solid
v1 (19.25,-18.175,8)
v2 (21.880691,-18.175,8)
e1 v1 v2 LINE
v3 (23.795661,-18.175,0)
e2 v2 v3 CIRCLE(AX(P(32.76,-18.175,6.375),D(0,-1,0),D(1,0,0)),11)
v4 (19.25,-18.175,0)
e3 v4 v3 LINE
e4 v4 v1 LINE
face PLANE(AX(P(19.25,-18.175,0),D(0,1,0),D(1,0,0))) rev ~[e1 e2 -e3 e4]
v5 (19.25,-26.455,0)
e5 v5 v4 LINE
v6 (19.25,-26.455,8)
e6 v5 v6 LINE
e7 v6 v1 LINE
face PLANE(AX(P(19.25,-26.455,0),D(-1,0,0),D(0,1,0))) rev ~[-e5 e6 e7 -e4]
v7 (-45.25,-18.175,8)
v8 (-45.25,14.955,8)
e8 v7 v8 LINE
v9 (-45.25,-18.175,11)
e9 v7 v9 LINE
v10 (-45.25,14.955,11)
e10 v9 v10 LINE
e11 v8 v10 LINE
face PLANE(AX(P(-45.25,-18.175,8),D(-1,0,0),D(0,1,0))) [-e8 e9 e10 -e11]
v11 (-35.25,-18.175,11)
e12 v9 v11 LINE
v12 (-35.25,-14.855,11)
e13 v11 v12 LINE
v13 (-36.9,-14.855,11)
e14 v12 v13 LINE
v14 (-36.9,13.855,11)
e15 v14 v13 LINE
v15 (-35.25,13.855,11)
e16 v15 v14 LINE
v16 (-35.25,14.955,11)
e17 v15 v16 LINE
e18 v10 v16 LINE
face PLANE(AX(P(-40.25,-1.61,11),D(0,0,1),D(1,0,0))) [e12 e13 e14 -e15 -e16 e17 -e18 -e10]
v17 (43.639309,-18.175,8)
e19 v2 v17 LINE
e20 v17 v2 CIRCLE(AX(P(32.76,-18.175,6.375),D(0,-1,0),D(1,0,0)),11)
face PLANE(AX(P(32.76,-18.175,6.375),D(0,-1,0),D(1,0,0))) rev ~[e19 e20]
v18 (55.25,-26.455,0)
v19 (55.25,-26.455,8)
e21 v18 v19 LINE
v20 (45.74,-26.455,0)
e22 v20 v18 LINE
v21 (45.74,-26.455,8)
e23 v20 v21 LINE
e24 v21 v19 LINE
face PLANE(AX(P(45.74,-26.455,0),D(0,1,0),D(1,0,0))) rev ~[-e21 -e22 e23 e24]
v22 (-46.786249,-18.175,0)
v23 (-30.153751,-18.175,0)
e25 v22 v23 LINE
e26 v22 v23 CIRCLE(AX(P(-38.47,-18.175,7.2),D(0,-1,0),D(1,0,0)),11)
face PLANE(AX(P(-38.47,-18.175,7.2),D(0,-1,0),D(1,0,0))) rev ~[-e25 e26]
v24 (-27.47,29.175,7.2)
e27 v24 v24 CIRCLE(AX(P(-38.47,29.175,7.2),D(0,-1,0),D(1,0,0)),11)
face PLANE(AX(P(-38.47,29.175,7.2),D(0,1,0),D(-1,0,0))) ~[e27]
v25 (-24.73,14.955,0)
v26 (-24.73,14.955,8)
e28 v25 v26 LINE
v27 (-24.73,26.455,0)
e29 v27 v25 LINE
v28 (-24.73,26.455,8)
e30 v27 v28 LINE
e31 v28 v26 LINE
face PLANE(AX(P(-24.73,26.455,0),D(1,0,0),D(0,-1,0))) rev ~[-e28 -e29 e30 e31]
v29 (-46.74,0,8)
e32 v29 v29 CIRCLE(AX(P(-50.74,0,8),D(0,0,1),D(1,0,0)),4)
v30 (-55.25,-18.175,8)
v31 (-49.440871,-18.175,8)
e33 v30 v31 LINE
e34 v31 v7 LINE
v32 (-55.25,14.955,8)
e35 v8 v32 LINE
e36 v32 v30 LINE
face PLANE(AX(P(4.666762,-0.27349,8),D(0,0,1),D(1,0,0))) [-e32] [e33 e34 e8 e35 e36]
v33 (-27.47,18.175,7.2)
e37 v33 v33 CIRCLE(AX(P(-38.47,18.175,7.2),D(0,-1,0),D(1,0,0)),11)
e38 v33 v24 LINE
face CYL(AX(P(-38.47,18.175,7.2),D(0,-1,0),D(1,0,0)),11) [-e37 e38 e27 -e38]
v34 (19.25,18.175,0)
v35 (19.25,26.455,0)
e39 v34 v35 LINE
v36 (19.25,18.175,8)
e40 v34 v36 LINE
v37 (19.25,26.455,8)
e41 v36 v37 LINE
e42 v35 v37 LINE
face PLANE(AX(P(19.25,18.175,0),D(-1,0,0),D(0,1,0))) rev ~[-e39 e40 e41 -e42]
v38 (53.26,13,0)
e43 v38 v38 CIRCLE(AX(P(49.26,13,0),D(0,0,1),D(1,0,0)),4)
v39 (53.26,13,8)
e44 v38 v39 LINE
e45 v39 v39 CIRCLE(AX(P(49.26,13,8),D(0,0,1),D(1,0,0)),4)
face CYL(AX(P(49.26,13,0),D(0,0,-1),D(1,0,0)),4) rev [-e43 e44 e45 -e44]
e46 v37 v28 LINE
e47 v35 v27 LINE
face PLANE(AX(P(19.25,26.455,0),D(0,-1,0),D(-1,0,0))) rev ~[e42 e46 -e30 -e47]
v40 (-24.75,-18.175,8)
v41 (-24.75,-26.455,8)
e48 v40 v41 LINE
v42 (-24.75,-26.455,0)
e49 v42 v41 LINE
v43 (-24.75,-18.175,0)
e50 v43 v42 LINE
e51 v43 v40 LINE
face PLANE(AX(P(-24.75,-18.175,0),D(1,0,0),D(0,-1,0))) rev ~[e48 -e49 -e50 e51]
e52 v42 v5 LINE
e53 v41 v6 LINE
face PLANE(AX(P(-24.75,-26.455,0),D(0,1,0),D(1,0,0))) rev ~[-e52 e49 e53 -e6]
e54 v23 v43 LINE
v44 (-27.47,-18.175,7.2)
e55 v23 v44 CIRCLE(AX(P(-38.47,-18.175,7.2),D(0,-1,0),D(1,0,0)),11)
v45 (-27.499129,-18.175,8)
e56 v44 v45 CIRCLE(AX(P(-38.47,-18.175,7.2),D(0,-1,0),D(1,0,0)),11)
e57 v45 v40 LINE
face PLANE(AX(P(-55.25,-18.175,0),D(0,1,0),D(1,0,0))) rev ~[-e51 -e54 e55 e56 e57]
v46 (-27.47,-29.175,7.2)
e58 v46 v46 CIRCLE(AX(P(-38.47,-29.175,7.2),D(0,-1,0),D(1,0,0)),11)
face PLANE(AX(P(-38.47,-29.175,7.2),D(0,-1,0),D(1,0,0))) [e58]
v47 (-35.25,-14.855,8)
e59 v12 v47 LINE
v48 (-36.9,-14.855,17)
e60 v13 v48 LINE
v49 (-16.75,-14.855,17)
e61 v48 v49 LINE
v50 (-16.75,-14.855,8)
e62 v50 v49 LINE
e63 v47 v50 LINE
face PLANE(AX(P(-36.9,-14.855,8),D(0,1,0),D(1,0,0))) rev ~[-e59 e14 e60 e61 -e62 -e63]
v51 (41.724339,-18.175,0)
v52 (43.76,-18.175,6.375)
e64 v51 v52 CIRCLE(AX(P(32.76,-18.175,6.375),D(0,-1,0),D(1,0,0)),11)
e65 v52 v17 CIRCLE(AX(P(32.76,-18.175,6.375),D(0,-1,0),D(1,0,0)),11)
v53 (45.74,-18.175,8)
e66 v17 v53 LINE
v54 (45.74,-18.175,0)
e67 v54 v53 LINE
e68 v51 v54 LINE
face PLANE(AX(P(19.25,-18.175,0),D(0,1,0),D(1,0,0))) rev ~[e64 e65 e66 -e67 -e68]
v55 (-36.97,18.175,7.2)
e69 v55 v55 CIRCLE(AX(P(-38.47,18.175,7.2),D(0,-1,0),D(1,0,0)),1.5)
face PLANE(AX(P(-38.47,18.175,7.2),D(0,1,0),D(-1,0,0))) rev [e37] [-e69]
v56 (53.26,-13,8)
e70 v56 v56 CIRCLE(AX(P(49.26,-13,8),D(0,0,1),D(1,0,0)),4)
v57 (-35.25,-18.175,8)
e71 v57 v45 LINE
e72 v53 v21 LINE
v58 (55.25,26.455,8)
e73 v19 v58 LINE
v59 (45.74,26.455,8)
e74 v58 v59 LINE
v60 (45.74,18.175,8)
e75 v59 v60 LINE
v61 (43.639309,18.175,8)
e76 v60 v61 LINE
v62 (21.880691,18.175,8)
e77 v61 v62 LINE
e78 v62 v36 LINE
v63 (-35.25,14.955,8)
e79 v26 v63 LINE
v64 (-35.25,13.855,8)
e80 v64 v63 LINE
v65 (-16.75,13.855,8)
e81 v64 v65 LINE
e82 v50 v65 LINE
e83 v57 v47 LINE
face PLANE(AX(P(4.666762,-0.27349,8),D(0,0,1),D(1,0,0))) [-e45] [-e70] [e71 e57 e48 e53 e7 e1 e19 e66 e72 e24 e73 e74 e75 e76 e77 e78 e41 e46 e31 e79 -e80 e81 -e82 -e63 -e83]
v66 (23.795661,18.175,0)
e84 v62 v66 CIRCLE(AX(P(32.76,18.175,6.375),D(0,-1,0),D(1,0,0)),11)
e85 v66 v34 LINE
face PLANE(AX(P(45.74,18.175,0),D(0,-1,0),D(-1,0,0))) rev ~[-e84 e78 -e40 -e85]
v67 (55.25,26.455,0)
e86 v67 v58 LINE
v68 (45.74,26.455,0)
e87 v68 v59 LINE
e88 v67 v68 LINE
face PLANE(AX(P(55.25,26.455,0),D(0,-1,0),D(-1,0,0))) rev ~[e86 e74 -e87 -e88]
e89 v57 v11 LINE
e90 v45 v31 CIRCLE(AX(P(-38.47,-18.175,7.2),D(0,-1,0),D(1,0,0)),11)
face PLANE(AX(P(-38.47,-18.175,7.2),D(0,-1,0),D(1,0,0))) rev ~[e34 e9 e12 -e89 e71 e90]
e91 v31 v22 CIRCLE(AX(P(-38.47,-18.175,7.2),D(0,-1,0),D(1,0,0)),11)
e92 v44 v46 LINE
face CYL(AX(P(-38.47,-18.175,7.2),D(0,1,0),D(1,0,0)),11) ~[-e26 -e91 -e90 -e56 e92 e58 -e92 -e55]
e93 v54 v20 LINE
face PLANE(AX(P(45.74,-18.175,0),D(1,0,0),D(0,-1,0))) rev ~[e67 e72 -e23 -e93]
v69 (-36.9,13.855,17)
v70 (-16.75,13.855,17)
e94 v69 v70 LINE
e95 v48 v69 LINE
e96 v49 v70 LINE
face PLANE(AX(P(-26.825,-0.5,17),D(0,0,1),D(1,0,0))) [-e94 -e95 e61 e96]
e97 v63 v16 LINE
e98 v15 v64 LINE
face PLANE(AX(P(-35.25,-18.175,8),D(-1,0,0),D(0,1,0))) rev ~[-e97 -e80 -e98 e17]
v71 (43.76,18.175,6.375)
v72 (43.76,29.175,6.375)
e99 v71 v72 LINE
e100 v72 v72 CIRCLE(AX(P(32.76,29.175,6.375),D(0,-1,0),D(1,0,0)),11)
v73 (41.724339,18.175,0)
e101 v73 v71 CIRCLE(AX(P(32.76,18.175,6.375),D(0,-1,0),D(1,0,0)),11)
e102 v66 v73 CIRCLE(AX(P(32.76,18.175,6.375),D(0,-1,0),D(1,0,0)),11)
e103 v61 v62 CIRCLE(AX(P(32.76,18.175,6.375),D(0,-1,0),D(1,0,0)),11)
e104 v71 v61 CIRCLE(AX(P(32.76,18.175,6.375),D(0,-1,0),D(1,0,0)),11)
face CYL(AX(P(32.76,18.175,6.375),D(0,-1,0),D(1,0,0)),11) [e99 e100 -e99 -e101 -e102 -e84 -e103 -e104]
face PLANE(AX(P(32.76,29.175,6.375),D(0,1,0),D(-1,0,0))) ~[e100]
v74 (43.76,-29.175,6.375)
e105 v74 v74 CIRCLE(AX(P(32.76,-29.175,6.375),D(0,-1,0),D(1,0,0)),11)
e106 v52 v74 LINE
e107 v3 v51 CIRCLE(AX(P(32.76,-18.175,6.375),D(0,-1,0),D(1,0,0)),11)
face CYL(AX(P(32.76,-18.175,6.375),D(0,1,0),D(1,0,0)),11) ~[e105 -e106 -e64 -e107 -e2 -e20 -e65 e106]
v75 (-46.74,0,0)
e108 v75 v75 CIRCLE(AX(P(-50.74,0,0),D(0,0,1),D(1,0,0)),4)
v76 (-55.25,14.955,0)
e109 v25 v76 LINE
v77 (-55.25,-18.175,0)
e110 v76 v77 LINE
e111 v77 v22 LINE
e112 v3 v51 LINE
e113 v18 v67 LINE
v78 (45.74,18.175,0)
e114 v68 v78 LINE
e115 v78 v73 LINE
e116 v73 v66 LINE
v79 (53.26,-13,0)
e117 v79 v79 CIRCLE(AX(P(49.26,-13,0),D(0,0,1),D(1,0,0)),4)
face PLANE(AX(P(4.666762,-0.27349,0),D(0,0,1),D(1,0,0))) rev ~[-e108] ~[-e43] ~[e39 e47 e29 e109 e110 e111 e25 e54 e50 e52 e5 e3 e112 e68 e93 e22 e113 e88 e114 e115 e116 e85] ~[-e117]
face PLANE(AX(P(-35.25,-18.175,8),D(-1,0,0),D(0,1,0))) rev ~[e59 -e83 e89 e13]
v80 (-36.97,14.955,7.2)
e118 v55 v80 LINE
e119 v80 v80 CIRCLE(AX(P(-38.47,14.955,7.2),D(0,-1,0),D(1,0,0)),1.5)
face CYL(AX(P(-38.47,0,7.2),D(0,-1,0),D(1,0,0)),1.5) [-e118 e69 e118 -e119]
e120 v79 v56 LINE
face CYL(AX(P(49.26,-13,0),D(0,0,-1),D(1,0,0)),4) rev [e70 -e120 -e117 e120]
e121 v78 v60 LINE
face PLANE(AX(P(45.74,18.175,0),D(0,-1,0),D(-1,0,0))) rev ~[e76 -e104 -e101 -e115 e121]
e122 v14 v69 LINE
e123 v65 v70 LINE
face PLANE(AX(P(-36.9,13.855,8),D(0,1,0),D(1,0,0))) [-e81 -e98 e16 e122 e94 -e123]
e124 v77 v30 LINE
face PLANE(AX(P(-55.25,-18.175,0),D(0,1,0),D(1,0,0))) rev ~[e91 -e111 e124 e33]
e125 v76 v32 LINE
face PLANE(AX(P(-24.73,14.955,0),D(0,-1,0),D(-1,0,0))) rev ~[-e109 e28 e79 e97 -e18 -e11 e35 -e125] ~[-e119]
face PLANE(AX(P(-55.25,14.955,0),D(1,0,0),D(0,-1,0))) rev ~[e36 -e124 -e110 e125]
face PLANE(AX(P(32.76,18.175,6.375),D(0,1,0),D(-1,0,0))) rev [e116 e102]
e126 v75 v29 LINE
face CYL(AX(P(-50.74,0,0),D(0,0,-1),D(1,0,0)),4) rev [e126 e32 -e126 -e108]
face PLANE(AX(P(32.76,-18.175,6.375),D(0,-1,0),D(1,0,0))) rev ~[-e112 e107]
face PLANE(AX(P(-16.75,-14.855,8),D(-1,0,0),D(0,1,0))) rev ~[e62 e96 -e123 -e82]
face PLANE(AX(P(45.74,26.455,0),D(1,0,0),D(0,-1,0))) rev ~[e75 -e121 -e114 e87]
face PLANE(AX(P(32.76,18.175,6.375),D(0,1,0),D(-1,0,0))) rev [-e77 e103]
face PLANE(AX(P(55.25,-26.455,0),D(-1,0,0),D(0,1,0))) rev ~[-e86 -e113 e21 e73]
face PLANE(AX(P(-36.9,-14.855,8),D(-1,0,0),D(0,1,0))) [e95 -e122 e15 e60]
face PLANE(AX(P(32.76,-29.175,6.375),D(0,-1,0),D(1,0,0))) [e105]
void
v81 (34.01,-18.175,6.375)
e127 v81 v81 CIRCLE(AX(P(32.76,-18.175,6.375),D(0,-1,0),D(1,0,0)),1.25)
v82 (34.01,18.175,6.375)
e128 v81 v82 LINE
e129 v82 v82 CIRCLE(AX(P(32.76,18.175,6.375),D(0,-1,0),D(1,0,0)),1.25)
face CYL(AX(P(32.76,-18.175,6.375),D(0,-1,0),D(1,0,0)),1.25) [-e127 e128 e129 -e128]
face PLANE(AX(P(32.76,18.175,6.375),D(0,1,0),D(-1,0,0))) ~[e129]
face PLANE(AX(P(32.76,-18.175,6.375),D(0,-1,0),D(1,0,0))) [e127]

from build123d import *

# Parameters (mm, degrees)
F0_R      = 4
F1_DEPTH  = 8
F2_W      = 10
F2_H      = 33.13
F3_DEPTH  = 3
F4_R      = 1.5
F5_DEPTH  = 26
F6_W      = 20.15
F6_H      = 28.71
F7_DEPTH  = 9
F8_R      = 11
F9_DEPTH  = 11
F10_R     = 1.25
F11_DEPTH = 47.351
F12_R     = 11
F13_DEPTH = 11


# Not quite as in the source:
# - a pattern or mirror of a feature is missing from the dataset's text; its kind, count and spacing are read off the source's solid


with BuildPart() as f1:
    # F0 (on Top) → F1 (new body)
    with BuildSketch(Plane.XY):
        Polygon((55.25, -26.455), (55.25, 26.455), (45.74, 26.455), (45.74, 18.175), (19.25, 18.175), (19.25, 26.455), (-24.73, 26.455), (-24.73, 14.955), (-55.25, 14.955), (-55.25, -18.175), (-24.75, -18.175), (-24.75, -26.455), (19.25, -26.455), (19.25, -18.175), (45.74, -18.175), (45.74, -26.455), align=None)
        with Locations((49.26, -13)):
            Circle(F0_R, mode=Mode.SUBTRACT)
        with Locations((-50.74, 0)):
            Circle(F0_R, mode=Mode.SUBTRACT)
        with Locations((49.26, 13)):
            Circle(F0_R, mode=Mode.SUBTRACT)
    extrude(amount=F1_DEPTH)

    # F2 (on face) → F3 (join)
    with BuildSketch(Plane.XY.offset(8)):
        with Locations((-40.25, -1.61)):
            Rectangle(F2_W, F2_H)
    extrude(amount=F3_DEPTH)

    # F4 (on Front) → F5 (join, symmetric)
    with BuildSketch(Plane.XZ):
        with Locations((-38.47, 7.2)):
            Circle(F4_R)
    extrude(amount=F5_DEPTH, both=True)

    # F6 (on face) → F7 (join)
    with BuildSketch(Plane.XY.offset(8)):
        with Locations((-26.825, -0.5)):
            Rectangle(F6_W, F6_H)
    extrude(amount=F7_DEPTH)

    # F8 (on face) → F9 (join)
    with BuildSketch(Plane.XZ.offset(18.175)):
        with Locations((-38.47, 7.2)):
            Circle(F8_R)
    f9 = extrude(amount=F9_DEPTH)

    # F9_copies: F9 across plane
    add(f9.mirror(Plane.ZX))

    # F10 (on face) → F11 (cut, through all)
    with BuildSketch(Plane.XZ.offset(18.175)):
        with Locations((32.76, 6.375)):
            Circle(F10_R)
    extrude(amount=-F11_DEPTH, mode=Mode.SUBTRACT)

    # F12 (on face) → F13 (join)
    with BuildSketch(Plane.XZ.offset(18.175)):
        with Locations((32.76, 6.375)):
            Circle(F12_R)
    f13 = extrude(amount=F13_DEPTH)

    # F13_copies: F13 across plane
    add(f13.mirror(Plane.ZX))


solid = f1.part
